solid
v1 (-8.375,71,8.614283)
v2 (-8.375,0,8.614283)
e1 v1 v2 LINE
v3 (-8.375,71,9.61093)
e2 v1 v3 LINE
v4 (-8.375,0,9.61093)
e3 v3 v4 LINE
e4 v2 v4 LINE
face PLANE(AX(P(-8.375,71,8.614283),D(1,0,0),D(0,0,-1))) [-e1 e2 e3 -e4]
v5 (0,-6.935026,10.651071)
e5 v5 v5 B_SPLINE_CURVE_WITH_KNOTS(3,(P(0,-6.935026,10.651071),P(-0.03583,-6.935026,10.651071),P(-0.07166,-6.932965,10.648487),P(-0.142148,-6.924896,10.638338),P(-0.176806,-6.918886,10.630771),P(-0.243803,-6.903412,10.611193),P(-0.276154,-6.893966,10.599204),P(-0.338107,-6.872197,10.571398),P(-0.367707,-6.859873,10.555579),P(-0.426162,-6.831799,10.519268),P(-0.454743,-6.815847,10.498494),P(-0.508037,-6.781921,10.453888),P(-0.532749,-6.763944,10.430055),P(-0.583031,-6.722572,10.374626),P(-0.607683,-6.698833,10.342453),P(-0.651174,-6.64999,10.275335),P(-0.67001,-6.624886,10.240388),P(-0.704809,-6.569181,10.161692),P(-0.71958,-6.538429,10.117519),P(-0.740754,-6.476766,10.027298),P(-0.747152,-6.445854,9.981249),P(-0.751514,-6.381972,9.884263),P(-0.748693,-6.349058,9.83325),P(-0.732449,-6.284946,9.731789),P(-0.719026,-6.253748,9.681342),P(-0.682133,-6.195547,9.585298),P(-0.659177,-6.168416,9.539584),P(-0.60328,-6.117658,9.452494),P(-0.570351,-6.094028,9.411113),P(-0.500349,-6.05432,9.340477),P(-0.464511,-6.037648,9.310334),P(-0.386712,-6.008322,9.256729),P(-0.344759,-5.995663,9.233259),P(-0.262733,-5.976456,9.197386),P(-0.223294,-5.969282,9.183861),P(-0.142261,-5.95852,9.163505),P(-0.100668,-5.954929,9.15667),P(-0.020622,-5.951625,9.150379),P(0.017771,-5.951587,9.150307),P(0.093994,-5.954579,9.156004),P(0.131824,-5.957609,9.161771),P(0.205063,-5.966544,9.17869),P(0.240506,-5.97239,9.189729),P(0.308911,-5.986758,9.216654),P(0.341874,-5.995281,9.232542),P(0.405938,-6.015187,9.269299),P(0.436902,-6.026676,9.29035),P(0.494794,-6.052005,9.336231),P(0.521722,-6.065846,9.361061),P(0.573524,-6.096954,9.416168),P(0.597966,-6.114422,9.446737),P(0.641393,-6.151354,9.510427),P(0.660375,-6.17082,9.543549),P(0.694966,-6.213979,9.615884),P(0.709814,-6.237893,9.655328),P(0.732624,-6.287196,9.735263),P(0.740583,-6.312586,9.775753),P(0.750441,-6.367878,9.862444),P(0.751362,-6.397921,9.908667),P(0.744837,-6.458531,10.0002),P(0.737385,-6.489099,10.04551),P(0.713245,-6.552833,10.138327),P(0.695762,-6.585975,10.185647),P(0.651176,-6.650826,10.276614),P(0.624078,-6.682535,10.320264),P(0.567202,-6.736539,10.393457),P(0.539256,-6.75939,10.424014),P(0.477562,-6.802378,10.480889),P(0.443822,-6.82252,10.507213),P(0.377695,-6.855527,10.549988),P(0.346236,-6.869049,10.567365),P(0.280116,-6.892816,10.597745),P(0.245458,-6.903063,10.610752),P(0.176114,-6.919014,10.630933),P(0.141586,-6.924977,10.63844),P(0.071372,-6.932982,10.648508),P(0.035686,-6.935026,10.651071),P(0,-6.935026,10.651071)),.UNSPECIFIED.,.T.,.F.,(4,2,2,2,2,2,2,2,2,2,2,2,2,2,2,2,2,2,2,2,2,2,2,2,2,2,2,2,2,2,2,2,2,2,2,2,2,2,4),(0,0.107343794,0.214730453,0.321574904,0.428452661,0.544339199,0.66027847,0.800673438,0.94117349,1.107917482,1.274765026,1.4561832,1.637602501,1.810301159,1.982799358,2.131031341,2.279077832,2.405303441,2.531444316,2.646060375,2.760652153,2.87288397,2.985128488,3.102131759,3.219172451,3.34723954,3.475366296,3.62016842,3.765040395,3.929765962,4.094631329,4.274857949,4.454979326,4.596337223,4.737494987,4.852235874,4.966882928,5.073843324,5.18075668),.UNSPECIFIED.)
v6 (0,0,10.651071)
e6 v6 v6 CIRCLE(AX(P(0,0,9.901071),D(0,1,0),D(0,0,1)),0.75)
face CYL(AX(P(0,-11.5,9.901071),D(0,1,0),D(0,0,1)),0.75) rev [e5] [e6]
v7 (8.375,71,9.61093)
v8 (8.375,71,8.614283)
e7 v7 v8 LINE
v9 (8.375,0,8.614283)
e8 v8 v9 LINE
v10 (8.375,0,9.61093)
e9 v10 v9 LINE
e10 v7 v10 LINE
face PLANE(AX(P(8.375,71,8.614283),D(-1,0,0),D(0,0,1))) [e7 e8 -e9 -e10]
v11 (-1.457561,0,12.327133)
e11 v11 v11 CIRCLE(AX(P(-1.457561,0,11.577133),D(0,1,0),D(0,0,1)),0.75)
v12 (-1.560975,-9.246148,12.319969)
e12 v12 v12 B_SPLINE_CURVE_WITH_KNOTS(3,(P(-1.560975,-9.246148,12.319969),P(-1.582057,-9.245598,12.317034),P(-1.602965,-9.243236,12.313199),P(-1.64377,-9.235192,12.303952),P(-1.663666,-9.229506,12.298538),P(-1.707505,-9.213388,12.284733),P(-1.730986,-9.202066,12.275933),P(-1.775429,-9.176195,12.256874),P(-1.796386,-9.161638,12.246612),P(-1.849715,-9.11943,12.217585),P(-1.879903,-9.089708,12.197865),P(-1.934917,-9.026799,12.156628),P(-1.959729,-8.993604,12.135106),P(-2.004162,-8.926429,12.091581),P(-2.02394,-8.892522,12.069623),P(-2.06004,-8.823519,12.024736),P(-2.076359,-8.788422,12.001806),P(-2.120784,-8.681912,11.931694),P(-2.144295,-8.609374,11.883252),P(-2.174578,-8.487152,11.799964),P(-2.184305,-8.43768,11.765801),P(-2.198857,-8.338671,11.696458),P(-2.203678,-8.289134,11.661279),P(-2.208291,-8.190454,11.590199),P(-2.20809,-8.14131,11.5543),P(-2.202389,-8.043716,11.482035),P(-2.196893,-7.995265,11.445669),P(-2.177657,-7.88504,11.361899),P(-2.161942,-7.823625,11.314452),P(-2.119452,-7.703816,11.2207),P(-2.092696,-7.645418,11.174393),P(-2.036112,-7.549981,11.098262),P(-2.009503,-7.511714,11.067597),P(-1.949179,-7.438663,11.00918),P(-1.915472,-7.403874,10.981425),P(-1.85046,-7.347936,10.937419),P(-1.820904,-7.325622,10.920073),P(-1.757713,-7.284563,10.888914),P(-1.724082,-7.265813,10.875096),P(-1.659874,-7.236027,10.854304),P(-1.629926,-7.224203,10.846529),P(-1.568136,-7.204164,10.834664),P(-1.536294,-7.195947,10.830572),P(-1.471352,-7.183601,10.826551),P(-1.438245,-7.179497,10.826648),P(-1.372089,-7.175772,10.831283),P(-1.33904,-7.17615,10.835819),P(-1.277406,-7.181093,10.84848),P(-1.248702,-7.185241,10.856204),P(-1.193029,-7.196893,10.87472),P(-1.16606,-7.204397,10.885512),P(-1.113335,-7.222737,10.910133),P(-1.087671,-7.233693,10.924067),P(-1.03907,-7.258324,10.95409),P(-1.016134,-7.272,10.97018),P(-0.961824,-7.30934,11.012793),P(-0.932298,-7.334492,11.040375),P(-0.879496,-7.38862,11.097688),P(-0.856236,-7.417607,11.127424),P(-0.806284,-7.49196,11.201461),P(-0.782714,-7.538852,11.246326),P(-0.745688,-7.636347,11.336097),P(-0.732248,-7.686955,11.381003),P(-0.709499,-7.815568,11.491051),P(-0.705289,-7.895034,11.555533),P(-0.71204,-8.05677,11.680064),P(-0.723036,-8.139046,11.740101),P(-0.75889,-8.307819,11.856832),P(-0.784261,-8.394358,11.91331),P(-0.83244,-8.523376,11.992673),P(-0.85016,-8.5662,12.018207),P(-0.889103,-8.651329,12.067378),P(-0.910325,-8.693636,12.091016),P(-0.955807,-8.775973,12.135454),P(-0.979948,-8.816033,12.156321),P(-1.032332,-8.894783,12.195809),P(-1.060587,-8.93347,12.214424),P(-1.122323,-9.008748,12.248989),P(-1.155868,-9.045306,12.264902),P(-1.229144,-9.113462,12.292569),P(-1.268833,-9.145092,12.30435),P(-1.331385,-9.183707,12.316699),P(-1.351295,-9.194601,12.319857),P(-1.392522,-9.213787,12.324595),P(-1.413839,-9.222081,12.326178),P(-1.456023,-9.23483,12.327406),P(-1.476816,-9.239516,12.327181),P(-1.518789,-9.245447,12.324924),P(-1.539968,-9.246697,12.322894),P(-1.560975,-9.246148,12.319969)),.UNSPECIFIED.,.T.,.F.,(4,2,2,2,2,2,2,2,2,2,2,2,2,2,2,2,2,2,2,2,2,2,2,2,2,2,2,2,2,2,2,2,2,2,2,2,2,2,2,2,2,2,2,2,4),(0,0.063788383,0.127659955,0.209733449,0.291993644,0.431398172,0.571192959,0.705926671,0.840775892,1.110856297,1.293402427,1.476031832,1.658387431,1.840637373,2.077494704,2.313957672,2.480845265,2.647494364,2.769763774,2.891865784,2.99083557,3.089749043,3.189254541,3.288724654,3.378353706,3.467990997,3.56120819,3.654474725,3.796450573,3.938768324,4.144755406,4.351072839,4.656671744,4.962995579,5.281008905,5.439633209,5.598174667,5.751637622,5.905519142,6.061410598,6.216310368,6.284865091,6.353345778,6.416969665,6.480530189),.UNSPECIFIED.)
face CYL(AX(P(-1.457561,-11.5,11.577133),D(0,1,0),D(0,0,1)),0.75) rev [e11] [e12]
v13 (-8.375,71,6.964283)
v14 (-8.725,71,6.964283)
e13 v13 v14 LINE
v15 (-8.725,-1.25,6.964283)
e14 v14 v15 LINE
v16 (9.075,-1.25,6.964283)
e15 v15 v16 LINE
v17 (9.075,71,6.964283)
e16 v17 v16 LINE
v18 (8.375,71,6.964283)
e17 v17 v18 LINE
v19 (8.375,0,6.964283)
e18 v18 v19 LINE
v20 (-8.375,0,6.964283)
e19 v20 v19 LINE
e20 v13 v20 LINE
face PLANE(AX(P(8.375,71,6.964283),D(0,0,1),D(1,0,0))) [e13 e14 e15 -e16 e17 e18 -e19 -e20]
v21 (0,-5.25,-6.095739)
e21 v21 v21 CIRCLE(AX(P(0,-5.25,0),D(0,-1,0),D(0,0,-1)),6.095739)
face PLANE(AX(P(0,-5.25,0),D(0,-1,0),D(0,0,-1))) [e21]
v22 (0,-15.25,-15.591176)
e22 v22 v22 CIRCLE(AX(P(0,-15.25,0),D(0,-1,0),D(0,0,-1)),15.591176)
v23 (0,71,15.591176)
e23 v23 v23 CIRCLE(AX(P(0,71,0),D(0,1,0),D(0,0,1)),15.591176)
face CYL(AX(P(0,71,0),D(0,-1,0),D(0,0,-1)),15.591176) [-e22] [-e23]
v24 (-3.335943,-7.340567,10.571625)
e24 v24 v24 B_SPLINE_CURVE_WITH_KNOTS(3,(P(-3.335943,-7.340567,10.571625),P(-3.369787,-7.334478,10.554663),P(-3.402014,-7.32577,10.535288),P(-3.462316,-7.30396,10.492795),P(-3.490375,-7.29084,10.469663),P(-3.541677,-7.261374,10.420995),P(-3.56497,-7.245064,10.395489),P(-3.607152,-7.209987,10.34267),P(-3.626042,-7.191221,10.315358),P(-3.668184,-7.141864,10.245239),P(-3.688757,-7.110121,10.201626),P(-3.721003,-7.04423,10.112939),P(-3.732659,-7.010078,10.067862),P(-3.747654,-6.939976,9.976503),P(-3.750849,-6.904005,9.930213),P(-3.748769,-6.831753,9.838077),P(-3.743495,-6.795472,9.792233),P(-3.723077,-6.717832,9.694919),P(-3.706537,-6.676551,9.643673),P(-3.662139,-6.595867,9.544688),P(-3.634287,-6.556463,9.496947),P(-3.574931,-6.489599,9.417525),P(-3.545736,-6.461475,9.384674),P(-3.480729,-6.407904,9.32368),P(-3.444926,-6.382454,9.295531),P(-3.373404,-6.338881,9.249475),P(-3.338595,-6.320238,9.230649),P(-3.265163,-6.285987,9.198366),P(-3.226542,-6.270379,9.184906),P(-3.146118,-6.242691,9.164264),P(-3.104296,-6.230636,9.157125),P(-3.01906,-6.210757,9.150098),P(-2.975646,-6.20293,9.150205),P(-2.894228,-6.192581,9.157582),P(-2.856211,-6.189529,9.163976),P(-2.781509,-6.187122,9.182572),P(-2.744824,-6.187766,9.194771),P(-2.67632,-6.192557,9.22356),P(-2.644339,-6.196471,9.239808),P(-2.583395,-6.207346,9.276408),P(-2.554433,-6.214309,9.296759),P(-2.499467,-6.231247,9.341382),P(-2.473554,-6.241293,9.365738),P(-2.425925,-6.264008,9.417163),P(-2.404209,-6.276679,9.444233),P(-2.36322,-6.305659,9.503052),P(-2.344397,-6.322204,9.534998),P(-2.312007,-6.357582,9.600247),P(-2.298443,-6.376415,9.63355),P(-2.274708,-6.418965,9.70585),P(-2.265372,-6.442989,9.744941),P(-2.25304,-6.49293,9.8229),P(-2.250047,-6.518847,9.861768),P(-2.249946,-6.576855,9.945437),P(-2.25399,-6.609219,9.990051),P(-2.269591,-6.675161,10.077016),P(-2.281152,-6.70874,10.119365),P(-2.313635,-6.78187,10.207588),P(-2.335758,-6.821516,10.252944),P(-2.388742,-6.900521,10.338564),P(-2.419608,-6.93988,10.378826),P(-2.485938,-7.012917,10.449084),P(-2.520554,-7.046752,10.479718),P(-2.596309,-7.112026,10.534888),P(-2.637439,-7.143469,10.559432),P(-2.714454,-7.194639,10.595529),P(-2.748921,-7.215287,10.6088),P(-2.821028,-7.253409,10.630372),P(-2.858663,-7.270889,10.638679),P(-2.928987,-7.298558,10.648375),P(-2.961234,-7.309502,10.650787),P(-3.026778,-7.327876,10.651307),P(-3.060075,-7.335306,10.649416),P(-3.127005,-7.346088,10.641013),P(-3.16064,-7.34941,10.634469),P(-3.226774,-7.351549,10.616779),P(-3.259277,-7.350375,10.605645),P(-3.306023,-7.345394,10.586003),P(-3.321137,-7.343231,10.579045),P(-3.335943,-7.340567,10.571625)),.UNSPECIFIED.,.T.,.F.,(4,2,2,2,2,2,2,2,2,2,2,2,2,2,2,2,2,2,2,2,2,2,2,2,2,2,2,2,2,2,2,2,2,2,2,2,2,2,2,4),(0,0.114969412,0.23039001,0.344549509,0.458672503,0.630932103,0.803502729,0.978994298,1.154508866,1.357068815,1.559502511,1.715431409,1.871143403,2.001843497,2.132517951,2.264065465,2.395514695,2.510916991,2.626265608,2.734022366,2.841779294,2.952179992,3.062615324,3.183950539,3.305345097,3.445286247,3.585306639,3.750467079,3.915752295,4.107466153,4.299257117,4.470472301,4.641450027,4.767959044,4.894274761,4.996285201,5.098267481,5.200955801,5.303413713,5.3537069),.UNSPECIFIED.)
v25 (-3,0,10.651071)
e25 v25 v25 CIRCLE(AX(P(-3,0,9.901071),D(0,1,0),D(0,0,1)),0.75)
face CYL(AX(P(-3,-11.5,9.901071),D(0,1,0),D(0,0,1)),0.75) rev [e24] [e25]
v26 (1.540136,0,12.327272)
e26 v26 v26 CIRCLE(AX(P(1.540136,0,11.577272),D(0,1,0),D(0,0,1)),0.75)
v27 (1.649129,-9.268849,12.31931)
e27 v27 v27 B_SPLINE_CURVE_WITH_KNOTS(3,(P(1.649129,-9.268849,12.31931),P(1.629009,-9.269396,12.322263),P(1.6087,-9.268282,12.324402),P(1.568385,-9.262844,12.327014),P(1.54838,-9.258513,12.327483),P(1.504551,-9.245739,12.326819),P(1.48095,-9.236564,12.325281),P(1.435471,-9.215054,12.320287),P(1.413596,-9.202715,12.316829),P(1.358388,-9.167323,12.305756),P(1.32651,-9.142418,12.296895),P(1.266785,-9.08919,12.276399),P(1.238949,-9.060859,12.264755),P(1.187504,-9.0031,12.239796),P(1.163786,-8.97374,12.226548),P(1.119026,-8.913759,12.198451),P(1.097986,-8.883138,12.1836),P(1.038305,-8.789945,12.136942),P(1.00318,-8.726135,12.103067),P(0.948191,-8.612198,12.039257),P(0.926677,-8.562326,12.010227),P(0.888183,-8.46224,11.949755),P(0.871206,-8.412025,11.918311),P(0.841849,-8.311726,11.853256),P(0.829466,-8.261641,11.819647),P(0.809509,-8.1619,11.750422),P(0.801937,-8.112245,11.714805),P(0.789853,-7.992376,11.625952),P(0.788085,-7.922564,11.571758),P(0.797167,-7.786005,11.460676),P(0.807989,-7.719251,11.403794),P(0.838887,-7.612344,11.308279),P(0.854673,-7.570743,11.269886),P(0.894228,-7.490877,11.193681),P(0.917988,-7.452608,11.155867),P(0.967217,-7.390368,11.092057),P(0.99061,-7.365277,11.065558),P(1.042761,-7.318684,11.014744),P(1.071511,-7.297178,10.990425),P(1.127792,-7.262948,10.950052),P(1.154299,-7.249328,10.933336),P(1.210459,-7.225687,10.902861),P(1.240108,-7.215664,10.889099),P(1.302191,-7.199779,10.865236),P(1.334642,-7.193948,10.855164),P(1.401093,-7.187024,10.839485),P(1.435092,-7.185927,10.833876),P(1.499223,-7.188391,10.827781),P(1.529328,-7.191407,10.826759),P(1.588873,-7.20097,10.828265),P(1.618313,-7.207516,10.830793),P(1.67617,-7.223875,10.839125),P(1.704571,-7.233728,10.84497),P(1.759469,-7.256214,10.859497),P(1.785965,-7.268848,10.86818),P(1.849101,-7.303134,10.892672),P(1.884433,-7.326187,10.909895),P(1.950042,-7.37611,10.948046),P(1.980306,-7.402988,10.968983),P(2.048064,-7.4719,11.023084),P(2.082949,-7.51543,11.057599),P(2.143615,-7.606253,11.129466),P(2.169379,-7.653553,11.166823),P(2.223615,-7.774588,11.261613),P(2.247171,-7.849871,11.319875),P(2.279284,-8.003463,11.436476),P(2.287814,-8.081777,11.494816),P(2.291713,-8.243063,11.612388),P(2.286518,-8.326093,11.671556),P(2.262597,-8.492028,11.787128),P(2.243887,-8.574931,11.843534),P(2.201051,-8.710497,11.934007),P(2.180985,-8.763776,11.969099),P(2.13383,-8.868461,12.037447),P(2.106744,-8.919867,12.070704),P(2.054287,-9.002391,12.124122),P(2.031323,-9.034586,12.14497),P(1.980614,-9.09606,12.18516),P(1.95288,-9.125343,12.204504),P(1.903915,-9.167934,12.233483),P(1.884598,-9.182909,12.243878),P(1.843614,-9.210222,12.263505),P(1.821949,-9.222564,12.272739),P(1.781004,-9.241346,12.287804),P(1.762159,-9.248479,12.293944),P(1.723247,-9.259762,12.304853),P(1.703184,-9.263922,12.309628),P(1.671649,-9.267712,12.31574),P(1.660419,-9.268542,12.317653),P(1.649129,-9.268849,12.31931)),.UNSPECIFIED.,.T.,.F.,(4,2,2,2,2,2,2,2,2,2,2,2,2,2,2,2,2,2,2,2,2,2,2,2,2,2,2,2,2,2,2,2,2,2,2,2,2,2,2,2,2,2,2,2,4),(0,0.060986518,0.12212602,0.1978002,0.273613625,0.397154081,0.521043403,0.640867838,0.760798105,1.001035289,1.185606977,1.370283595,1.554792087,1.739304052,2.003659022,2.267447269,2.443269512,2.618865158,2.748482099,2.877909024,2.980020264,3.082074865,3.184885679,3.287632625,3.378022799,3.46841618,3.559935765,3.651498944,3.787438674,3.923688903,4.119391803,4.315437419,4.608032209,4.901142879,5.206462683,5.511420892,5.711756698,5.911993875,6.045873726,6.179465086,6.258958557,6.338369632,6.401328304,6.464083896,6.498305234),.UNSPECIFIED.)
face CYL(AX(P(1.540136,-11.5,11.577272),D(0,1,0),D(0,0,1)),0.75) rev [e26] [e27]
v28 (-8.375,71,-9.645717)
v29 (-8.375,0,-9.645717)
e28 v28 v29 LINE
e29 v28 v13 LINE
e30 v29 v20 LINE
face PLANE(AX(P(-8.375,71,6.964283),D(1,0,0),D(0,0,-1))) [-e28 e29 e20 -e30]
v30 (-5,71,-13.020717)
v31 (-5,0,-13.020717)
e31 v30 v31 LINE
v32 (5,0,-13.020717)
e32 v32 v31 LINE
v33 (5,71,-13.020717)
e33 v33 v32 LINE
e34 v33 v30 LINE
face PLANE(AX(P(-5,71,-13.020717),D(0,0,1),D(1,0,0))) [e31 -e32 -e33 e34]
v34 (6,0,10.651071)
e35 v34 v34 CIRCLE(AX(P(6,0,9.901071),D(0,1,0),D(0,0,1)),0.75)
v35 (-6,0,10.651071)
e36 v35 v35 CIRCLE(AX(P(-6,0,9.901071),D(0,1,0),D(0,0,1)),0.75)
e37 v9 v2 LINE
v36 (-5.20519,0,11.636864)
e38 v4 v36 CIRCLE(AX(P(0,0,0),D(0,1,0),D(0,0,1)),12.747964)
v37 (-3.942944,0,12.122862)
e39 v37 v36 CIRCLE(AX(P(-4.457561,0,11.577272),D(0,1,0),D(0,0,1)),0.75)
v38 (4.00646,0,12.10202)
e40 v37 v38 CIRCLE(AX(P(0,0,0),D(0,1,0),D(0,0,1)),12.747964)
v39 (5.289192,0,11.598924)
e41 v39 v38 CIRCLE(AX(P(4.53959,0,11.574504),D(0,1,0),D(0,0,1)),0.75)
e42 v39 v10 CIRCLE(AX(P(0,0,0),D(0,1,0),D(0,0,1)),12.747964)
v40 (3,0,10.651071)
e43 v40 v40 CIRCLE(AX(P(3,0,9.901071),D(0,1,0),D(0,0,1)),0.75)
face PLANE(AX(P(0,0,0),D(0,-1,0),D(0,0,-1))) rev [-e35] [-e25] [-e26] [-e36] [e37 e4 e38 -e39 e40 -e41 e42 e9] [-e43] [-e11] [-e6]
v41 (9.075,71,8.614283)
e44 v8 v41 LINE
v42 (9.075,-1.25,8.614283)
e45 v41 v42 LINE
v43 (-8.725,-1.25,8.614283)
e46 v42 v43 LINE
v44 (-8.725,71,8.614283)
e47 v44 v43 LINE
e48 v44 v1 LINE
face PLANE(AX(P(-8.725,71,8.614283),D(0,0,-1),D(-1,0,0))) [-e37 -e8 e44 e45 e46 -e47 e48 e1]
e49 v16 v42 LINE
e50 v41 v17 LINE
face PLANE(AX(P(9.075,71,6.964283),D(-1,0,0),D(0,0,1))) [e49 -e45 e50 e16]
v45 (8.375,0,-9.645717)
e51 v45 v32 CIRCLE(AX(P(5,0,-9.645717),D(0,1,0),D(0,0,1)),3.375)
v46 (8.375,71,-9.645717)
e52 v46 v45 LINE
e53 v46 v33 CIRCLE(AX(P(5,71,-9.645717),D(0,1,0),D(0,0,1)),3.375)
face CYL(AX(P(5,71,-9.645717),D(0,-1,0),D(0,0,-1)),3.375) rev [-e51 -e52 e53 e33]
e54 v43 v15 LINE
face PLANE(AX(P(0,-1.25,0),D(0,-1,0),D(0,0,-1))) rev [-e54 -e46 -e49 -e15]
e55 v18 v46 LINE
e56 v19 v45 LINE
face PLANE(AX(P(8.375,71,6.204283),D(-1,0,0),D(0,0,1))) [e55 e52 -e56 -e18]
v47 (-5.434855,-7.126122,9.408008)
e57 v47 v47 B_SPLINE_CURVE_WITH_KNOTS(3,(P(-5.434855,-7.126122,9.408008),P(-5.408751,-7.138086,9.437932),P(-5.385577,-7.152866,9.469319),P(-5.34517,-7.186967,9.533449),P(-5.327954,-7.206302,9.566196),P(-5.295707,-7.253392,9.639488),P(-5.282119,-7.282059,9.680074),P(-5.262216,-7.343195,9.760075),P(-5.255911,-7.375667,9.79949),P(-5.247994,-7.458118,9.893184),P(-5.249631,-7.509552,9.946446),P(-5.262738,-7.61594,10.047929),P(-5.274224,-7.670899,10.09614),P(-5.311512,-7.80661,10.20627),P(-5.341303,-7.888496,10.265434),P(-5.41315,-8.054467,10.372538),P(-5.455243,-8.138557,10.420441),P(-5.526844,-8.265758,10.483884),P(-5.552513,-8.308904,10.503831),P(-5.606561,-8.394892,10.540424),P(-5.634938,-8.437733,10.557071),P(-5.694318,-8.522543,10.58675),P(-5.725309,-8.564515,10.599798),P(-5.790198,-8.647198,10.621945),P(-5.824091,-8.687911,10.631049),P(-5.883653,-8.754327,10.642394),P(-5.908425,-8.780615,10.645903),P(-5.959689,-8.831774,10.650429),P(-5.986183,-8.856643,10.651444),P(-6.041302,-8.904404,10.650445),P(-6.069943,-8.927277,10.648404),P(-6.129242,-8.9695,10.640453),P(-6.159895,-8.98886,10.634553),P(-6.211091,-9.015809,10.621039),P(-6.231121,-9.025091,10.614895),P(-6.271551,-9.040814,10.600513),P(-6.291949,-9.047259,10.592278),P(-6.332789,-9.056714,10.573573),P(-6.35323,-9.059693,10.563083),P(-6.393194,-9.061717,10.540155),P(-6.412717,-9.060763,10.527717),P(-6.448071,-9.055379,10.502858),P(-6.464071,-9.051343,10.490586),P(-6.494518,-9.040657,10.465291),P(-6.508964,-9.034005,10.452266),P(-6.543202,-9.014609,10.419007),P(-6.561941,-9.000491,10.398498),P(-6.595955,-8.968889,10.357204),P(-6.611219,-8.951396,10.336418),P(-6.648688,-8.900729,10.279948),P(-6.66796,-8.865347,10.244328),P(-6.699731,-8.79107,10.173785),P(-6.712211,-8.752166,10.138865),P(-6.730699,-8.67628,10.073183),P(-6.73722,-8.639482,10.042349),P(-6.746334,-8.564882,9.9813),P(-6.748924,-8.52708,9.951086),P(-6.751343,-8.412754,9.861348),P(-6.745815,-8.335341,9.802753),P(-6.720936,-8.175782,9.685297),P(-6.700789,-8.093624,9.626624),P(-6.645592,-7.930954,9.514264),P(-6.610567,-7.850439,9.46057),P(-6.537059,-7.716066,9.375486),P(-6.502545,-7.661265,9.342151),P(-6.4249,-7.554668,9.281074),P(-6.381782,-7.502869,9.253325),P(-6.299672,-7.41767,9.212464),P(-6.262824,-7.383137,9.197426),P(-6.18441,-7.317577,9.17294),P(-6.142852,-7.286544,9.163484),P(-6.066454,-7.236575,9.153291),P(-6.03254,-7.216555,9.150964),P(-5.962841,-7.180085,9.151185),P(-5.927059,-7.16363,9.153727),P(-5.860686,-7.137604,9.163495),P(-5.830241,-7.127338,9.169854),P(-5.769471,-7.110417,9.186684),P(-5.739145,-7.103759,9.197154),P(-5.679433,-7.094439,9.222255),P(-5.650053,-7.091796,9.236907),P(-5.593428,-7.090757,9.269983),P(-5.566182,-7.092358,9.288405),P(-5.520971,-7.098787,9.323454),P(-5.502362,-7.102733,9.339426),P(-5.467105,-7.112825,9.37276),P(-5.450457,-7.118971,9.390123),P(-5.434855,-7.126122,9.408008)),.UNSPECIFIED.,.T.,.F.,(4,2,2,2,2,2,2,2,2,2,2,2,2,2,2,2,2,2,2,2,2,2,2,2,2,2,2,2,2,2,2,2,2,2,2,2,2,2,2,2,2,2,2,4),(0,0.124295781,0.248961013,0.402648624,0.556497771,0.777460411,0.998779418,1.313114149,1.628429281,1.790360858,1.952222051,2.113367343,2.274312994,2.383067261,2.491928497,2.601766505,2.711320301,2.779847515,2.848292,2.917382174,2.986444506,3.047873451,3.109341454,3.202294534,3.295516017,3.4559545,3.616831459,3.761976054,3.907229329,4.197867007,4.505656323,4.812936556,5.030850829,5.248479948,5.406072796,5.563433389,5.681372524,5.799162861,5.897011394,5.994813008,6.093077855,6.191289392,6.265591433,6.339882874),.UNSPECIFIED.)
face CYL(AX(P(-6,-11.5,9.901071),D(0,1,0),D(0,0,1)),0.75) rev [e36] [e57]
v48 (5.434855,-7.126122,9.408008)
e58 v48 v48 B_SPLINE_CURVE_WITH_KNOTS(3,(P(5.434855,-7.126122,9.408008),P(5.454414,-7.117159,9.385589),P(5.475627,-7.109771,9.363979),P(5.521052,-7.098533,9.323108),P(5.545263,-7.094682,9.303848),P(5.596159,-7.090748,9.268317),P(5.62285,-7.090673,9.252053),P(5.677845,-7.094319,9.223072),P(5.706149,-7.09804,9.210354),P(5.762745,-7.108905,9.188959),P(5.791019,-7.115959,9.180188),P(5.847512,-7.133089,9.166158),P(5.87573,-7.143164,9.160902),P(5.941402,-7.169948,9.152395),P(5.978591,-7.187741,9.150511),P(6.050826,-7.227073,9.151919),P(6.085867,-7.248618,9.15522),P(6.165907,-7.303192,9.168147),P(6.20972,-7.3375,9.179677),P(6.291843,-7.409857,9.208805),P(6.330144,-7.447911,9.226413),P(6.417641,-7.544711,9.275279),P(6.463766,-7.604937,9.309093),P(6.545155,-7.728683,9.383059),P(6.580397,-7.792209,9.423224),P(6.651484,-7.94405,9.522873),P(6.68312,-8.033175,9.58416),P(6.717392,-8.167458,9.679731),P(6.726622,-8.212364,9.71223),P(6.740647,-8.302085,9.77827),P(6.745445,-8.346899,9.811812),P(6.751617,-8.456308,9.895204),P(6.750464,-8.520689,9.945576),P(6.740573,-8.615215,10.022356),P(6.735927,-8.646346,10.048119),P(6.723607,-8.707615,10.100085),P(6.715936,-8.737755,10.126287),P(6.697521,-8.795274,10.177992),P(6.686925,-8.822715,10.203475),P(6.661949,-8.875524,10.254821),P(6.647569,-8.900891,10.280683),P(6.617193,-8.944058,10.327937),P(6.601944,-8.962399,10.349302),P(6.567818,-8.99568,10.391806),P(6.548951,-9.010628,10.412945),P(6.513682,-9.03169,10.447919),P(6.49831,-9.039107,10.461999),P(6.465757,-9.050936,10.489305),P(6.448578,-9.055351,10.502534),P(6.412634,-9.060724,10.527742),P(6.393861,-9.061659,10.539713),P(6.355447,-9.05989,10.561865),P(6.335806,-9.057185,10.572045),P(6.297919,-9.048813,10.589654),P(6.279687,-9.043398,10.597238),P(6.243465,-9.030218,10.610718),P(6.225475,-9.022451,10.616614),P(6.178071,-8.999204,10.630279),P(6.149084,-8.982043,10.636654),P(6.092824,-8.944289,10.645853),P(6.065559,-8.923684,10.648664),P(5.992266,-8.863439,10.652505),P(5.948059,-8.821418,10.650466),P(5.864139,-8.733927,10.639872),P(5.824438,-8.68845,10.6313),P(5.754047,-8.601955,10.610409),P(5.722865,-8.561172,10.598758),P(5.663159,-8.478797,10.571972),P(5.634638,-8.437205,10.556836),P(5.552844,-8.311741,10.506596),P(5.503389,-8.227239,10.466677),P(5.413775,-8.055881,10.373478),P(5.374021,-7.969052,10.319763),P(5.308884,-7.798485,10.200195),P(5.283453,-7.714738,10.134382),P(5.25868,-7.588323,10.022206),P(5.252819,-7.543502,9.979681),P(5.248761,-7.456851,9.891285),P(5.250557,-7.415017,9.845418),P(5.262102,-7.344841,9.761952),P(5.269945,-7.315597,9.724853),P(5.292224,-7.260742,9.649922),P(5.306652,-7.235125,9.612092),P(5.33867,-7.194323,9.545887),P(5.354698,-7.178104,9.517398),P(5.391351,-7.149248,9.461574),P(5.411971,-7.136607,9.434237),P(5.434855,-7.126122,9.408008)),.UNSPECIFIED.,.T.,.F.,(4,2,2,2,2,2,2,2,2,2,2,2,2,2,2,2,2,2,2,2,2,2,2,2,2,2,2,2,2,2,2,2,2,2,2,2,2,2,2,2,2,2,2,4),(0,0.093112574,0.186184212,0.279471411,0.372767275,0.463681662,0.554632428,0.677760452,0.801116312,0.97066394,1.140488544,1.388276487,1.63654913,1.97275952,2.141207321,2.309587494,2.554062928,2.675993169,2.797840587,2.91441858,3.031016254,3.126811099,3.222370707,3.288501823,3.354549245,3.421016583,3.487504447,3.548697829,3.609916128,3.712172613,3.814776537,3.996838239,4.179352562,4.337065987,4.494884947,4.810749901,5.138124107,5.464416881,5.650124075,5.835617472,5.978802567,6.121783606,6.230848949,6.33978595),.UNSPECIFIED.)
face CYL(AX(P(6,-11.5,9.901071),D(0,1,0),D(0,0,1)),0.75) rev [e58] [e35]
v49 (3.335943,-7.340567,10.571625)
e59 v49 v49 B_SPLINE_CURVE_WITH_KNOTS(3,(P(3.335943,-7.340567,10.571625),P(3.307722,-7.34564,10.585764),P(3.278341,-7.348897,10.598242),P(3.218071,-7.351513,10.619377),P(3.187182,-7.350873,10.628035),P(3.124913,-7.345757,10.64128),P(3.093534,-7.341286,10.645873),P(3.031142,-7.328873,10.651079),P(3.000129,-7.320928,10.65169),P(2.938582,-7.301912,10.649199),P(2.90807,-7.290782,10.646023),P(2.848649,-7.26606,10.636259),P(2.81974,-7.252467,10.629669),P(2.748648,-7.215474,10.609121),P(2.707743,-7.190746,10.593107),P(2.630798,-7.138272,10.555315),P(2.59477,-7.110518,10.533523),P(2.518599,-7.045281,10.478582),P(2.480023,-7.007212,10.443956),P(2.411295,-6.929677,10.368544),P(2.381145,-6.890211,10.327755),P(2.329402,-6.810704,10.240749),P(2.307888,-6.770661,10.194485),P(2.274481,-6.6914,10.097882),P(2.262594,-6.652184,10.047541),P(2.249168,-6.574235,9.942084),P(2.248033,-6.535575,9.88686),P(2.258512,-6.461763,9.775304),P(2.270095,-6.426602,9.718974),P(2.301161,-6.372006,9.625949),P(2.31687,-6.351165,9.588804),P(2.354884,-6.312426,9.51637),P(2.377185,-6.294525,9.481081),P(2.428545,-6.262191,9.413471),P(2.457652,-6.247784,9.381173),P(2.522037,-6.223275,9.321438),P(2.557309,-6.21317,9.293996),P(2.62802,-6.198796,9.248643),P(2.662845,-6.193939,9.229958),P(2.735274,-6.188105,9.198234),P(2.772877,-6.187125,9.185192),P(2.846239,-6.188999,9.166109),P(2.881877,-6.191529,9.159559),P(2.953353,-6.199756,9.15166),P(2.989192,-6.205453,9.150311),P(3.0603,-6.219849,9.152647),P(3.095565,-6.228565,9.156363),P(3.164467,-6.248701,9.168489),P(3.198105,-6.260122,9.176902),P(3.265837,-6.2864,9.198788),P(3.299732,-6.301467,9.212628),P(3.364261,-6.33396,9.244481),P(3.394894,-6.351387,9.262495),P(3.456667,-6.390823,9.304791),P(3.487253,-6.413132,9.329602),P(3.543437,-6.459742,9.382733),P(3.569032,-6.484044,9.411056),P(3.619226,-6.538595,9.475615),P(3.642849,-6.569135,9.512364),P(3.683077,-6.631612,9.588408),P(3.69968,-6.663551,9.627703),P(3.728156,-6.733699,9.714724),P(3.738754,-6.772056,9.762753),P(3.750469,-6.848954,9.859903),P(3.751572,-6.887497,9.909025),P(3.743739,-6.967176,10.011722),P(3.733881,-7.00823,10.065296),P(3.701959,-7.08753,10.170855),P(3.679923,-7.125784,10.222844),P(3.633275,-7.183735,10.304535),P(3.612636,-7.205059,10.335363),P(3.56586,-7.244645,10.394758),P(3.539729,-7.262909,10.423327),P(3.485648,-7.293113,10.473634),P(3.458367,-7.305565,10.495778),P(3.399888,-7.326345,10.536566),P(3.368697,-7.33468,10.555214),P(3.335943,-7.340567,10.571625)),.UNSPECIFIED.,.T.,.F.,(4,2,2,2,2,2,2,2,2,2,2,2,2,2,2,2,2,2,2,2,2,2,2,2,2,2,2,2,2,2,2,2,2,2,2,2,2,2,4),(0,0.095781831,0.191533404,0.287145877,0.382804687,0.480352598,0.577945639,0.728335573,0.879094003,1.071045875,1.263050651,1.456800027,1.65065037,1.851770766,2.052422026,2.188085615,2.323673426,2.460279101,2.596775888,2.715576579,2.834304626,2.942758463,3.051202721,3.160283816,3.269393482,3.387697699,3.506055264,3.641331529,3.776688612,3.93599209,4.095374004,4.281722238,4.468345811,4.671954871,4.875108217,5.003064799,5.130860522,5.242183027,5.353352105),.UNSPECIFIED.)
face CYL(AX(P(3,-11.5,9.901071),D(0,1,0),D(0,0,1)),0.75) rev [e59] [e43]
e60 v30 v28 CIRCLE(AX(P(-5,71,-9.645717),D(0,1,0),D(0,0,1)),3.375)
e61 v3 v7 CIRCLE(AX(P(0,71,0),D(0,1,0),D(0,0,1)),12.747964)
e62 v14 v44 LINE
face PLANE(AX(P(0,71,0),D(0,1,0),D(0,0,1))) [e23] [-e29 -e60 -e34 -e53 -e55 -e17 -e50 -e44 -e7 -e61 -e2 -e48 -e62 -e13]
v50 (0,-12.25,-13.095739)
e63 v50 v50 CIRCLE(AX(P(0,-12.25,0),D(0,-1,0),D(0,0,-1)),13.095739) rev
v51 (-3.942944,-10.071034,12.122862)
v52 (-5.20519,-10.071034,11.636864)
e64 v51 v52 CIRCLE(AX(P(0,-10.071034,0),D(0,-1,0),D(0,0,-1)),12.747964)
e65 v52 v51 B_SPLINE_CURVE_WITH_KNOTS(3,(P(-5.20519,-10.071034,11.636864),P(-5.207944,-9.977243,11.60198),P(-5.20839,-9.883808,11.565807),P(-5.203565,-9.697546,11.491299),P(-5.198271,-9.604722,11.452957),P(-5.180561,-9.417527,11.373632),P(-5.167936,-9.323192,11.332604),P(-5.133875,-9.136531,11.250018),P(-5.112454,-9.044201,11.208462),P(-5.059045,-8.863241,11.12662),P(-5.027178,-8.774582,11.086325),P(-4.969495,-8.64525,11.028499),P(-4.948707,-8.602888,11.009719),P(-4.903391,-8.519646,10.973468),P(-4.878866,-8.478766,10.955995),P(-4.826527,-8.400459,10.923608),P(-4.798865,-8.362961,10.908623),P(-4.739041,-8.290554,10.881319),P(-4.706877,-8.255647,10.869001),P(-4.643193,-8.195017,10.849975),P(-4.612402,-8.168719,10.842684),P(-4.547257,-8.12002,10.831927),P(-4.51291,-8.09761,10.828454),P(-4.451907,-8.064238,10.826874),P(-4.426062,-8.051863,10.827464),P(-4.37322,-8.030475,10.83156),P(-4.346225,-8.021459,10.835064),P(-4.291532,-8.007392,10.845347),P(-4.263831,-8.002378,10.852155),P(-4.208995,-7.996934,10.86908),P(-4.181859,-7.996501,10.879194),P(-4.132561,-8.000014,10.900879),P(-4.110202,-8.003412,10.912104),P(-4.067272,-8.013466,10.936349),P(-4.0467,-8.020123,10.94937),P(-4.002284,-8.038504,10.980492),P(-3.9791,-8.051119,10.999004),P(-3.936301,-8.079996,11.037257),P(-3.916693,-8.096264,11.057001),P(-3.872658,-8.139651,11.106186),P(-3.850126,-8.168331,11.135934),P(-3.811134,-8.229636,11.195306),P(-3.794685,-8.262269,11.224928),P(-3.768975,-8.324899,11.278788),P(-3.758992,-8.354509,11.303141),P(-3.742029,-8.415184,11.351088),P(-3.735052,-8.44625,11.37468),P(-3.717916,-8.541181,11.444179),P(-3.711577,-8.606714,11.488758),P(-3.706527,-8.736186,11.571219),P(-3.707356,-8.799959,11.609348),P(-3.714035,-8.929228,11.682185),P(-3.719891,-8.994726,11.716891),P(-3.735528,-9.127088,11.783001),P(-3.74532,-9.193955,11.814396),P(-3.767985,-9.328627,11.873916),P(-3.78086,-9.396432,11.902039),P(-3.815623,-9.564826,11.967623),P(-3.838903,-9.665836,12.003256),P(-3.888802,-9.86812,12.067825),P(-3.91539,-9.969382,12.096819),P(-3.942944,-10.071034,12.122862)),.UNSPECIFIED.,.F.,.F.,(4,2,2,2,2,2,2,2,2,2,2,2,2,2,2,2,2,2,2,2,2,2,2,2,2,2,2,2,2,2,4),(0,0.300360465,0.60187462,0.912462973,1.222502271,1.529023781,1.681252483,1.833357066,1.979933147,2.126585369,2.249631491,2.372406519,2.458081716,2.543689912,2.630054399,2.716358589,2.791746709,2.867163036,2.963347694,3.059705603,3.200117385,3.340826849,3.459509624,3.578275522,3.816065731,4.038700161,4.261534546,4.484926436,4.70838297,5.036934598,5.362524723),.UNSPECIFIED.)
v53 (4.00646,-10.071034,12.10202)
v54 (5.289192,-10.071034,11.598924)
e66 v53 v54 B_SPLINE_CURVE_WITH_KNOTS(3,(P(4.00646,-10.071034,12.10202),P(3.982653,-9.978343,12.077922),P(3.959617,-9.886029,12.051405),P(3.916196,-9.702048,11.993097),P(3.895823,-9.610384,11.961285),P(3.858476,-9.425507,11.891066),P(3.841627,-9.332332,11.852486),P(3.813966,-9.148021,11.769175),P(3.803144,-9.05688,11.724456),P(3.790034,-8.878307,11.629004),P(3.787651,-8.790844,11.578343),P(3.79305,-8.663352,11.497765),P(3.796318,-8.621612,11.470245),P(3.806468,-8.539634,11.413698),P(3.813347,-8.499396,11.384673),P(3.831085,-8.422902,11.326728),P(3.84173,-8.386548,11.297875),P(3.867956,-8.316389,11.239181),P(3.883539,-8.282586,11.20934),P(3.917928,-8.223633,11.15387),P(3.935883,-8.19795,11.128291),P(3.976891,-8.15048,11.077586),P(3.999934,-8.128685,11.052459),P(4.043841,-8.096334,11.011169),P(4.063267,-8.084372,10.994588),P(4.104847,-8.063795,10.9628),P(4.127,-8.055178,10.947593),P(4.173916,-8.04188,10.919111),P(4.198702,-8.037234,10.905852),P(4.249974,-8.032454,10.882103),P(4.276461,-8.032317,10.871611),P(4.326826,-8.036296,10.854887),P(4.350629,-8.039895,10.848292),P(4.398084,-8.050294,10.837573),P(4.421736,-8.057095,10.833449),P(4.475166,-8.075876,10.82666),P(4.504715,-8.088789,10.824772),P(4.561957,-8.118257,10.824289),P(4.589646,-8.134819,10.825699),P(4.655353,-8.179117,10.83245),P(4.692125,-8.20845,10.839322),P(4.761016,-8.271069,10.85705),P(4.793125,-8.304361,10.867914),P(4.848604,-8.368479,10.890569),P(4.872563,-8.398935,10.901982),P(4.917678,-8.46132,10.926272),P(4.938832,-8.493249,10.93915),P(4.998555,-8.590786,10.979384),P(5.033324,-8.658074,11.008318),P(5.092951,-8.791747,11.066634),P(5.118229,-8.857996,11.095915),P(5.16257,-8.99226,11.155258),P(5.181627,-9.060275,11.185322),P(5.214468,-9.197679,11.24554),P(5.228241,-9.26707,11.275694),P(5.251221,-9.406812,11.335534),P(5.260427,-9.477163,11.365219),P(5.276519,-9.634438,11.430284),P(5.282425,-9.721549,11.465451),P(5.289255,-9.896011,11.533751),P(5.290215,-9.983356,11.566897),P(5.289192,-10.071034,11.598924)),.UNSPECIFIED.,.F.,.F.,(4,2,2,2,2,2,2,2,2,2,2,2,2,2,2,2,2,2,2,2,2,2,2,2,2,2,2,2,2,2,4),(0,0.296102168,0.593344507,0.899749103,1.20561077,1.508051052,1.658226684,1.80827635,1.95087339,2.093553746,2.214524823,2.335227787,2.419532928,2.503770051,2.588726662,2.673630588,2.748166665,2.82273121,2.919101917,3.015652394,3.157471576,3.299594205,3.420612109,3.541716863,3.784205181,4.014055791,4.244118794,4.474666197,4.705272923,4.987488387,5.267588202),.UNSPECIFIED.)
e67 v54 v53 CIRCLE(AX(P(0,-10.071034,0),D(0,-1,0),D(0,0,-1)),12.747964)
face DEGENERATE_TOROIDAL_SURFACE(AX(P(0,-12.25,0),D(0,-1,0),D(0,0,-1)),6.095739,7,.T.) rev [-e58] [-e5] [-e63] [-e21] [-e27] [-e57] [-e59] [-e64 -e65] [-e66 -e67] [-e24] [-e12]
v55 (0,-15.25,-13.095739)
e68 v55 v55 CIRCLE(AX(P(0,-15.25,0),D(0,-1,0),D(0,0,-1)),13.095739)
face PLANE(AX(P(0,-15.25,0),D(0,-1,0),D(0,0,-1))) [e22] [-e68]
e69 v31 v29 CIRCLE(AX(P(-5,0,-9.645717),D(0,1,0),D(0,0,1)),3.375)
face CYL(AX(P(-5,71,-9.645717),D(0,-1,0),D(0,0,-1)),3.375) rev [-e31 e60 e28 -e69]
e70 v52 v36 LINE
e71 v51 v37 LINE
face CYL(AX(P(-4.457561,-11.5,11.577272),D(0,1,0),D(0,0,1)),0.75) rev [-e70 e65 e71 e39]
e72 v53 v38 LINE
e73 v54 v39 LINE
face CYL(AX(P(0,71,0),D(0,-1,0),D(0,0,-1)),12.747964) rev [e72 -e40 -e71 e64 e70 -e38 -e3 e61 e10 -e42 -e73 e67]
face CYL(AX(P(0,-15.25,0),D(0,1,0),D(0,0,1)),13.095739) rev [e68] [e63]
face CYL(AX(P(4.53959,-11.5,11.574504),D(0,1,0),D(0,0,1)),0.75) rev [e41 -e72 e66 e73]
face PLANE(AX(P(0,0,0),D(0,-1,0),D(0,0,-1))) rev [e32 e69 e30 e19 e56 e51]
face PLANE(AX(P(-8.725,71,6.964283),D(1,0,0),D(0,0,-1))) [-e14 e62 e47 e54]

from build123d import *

# Parameters (mm, degrees)
SKETCH1_R           = 15.591175954
BOSS_EXTRUDE1_DEPTH = 71
BOSS_EXTRUDE2_START = 1.25
SKETCH2_R           = 15.591175954
SKETCH2_W           = 17.8
SKETCH2_H           = 1.65
BOSS_EXTRUDE2_DEPTH = 1.25
BOSS_EXTRUDE3_START = 4
SKETCH3_R           = 15.591175954
BOSS_EXTRUDE3_DEPTH = 4
CUT_EXTRUDE4_START  = -11.5
SKETCH16_R          = 0.75
CUT_EXTRUDE4_DEPTH  = 11.5
BOSS_EXTRUDE8_START = 10
SKETCH18_R          = 15.591175954
SKETCH18_R_2        = 13.095738675
BOSS_EXTRUDE8_DEPTH = 10
FILLET3_START       = -12.2500001
FILLET3_OUTLINE_R   = 13.095738675
FILLET3_OUTLINE_R_2 = 0.75
FILLET3_DEPTH       = 7.0000001
FILLET3_START_2     = -11
FILLET3_3_DEPTH     = 5.75


with BuildPart() as part:
    # Sketch1 → Boss-Extrude1 (new body)
    with BuildSketch(Plane(origin=(0, 0, 0), x_dir=(1, 0, 0), z_dir=(0, 1, 0))):
        with Locations(Location((0, 0, 0), (0, 0, 270))):
            Circle(SKETCH1_R)
        with BuildLine():
            Line((8.375, -6.964282891), (9.075, -6.964282891))
            Line((9.075, -6.964282891), (9.075, -8.614282891))
            Line((9.075, -8.614282891), (8.375, -8.614282891))
            Line((8.375, -8.614282891), (8.375, -9.610929808))
            ThreePointArc((8.375, -9.610929808), (0, -12.747964417), (-8.375, -9.610929808))
            Line((-8.375, -9.610929808), (-8.375, -8.614282891))
            Line((-8.375, -8.614282891), (-8.725, -8.614282891))
            Line((-8.725, -8.614282891), (-8.725, -6.964282891))
            Line((-8.725, -6.964282891), (-8.375, -6.964282891))
            Line((-8.375, -6.964282891), (-8.375, -6.204282891))
            Line((-8.375, -6.204282891), (-8.375, 9.645717109))
            ThreePointArc((-8.375, 9.645717109), (-7.386485387, 12.032202496), (-5, 13.020717109))
            Line((-5, 13.020717109), (5, 13.020717109))
            ThreePointArc((5, 13.020717109), (7.386485387, 12.032202496), (8.375, 9.645717109))
            Line((8.375, 9.645717109), (8.375, -6.204282891))
            Line((8.375, -6.204282891), (8.375, -6.964282891))
        make_face(mode=Mode.SUBTRACT)
    extrude(amount=BOSS_EXTRUDE1_DEPTH)

    # Sketch2 → Boss-Extrude2 (add)
    with BuildSketch(Plane.XZ.offset(BOSS_EXTRUDE2_START)):
        with Locations(Location((0, 0, 0), (0, 0, 270))):
            Circle(SKETCH2_R)
        with Locations((0.175, 7.789282891)):
            Rectangle(SKETCH2_W, SKETCH2_H, mode=Mode.SUBTRACT)
    extrude(amount=-BOSS_EXTRUDE2_DEPTH)

    # Sketch3 → Boss-Extrude3 (add)
    with BuildSketch(Plane.XZ.offset(1.25).offset(BOSS_EXTRUDE3_START)):
        with Locations(Location((0, 0, 0), (0, 0, 270))):
            Circle(SKETCH3_R)
    extrude(amount=-BOSS_EXTRUDE3_DEPTH)

    # Sketch16 → Cut-Extrude4 (cut)
    with BuildSketch(Plane(origin=(0, 0, 0), x_dir=(1, 0, 0), z_dir=(0, 1, 0)).offset(CUT_EXTRUDE4_START)):
        with BuildLine():
            Line((-3.75, -9.901070776), (-3, -9.901070776))
            Line((-3, -9.901070776), (-2.25, -9.901070776))
            ThreePointArc((-2.25, -9.901070776), (-3, -9.151070776), (-3.75, -9.901070776))
        make_face()
        with BuildLine():
            Line((-2.25, -9.901070776), (-3, -9.901070776))
            Line((-3, -9.901070776), (-3.75, -9.901070776))
            ThreePointArc((-3.75, -9.901070776), (-3, -10.651070776), (-2.25, -9.901070776))
        make_face()
        with BuildLine():
            ThreePointArc((6.75, -9.901070776), (6, -9.151070776), (5.25, -9.901070776))
            ThreePointArc((5.25, -9.901070776), (6, -10.651070776), (6.75, -9.901070776))
        make_face()
        with BuildLine():
            ThreePointArc((3.75, -9.901070776), (3, -9.151070776), (2.25, -9.901070776))
            Line((2.25, -9.901070776), (3, -9.901070776))
            Line((3, -9.901070776), (3.75, -9.901070776))
        make_face()
        with BuildLine():
            Line((3, -9.901070776), (2.25, -9.901070776))
            ThreePointArc((2.25, -9.901070776), (3, -10.651070776), (3.75, -9.901070776))
            Line((3.75, -9.901070776), (3, -9.901070776))
        make_face()
        with BuildLine():
            ThreePointArc((0.75, -9.901070776), (0, -9.151070776), (-0.75, -9.901070776))
            Line((-0.75, -9.901070776), (0, -9.901070776))
            Line((0, -9.901070776), (0.75, -9.901070776))
        make_face()
        with BuildLine():
            Line((0, -9.901070776), (-0.75, -9.901070776))
            ThreePointArc((-0.75, -9.901070776), (0, -10.651070776), (0.75, -9.901070776))
            Line((0.75, -9.901070776), (0, -9.901070776))
        make_face()
        with Locations(Location((-6, -9.901070776, 0), (0, 0, 270))):
            Circle(SKETCH16_R)
        with BuildLine():
            ThreePointArc((5.289192257, -11.598924176), (4.550417773, -10.824582592), (3.789595018, -11.577272013))
            ThreePointArc((3.789595018, -11.577272013), (3.846450326, -11.860961254), (4.006459728, -12.102019552))
            ThreePointArc((4.006459728, -12.102019552), (4.654628095, -11.867815051), (5.289192257, -11.598924176))
        make_face()
        with BuildLine():
            ThreePointArc((2.290136401, -11.577272013), (1.540136401, -10.827272013), (0.790136401, -11.577272013))
            Line((0.790136401, -11.577272013), (1.540136401, -11.577272013))
            Line((1.540136401, -11.577272013), (2.290136401, -11.577272013))
        make_face()
        with BuildLine():
            Line((1.540136401, -11.577272013), (0.790136401, -11.577272013))
            ThreePointArc((0.790136401, -11.577272013), (1.540136401, -12.327272013), (2.290136401, -11.577272013))
            Line((2.290136401, -11.577272013), (1.540136401, -11.577272013))
        make_face()
        with BuildLine():
            ThreePointArc((-0.707561207, -11.577133163), (-2.207561203, -11.577063737), (-0.707561219, -11.577272013))
            ThreePointArc((-0.707561219, -11.577272013), (-0.70756121, -11.577202588), (-0.707561207, -11.577133163))
        make_face()
        with BuildLine():
            ThreePointArc((-5.205190023, -11.636863564), (-4.580517042, -11.896615502), (-3.942943702, -12.122862358))
            ThreePointArc((-3.942943702, -12.122862358), (-4.188076003, -10.877359358), (-5.205190023, -11.636863564))
        make_face()
    extrude(amount=CUT_EXTRUDE4_DEPTH, mode=Mode.SUBTRACT)

    # Sketch18 → Boss-Extrude8 (add)
    with BuildSketch(Plane.XZ.offset(5.25).offset(BOSS_EXTRUDE8_START)):
        with Locations(Location((0, 0, 0), (0, 0, 270))):
            Circle(SKETCH18_R)
        with Locations(Location((0, 0, 0), (0, 0, 270))):
            Circle(SKETCH18_R_2, mode=Mode.SUBTRACT)
    extrude(amount=-BOSS_EXTRUDE8_DEPTH)

    # Fillet3: read off the stored shape, not the designer's step
    # Fillet3 outline → Fillet3 (add)
    with BuildSketch(Plane(origin=(0, 0, 0), x_dir=(1, 0, 0), z_dir=(0, 1, 0)).offset(FILLET3_START)):
        Circle(FILLET3_OUTLINE_R)
        with Locations((-6, -9.901070776)):
            Circle(FILLET3_OUTLINE_R_2, mode=Mode.SUBTRACT)
        with Locations((-1.457561207, -11.577133163)):
            Circle(FILLET3_OUTLINE_R_2, mode=Mode.SUBTRACT)
        with Locations((-3, -9.901070776)):
            Circle(FILLET3_OUTLINE_R_2, mode=Mode.SUBTRACT)
        with Locations((1.540136401, -11.577272013)):
            Circle(FILLET3_OUTLINE_R_2, mode=Mode.SUBTRACT)
        with Locations((0, -9.901070776)):
            Circle(FILLET3_OUTLINE_R_2, mode=Mode.SUBTRACT)
        with Locations((3, -9.901070776)):
            Circle(FILLET3_OUTLINE_R_2, mode=Mode.SUBTRACT)
        with Locations((6, -9.901070776)):
            Circle(FILLET3_OUTLINE_R_2, mode=Mode.SUBTRACT)
    extrude(amount=FILLET3_DEPTH)

    # Fillet3 2 outline → Fillet3 2 (revolve, cut)
    with BuildSketch(Plane.XY):
        with BuildLine():
            Line((6.095738675, -5.25), (0, -5.25))
            Line((0, -5.25), (0, -12.25))
            Line((0, -12.25), (13.095738675, -12.25))
            ThreePointArc((13.095738675, -12.25), (11.045486143, -7.300252532), (6.095738675, -5.25))
        make_face()
    revolve(axis=Axis((0, 0, 0), (0, 1, 0)), mode=Mode.SUBTRACT)

    # Fillet3 3 outline → Fillet3 3 (cut)
    with BuildSketch(Plane(origin=(0, 0, 0), x_dir=(1, 0, 0), z_dir=(0, 1, 0)).offset(FILLET3_START_2)):
        with BuildLine():
            ThreePointArc((4.006459728, -12.102019552), (4.654628094, -11.867815051), (5.289192257, -11.598924176))
            ThreePointArc((5.289192257, -11.598924176), (4.265744538, -10.876286186), (4.006459728, -12.102019552))
        make_face()
        with BuildLine():
            ThreePointArc((-5.205190023, -11.636863564), (-4.580517042, -11.896615502), (-3.942943702, -12.122862358))
            ThreePointArc((-3.942943702, -12.122862358), (-4.188076003, -10.877359358), (-5.205190023, -11.636863564))
        make_face()
    extrude(amount=FILLET3_3_DEPTH, mode=Mode.SUBTRACT)


solid = part.part
